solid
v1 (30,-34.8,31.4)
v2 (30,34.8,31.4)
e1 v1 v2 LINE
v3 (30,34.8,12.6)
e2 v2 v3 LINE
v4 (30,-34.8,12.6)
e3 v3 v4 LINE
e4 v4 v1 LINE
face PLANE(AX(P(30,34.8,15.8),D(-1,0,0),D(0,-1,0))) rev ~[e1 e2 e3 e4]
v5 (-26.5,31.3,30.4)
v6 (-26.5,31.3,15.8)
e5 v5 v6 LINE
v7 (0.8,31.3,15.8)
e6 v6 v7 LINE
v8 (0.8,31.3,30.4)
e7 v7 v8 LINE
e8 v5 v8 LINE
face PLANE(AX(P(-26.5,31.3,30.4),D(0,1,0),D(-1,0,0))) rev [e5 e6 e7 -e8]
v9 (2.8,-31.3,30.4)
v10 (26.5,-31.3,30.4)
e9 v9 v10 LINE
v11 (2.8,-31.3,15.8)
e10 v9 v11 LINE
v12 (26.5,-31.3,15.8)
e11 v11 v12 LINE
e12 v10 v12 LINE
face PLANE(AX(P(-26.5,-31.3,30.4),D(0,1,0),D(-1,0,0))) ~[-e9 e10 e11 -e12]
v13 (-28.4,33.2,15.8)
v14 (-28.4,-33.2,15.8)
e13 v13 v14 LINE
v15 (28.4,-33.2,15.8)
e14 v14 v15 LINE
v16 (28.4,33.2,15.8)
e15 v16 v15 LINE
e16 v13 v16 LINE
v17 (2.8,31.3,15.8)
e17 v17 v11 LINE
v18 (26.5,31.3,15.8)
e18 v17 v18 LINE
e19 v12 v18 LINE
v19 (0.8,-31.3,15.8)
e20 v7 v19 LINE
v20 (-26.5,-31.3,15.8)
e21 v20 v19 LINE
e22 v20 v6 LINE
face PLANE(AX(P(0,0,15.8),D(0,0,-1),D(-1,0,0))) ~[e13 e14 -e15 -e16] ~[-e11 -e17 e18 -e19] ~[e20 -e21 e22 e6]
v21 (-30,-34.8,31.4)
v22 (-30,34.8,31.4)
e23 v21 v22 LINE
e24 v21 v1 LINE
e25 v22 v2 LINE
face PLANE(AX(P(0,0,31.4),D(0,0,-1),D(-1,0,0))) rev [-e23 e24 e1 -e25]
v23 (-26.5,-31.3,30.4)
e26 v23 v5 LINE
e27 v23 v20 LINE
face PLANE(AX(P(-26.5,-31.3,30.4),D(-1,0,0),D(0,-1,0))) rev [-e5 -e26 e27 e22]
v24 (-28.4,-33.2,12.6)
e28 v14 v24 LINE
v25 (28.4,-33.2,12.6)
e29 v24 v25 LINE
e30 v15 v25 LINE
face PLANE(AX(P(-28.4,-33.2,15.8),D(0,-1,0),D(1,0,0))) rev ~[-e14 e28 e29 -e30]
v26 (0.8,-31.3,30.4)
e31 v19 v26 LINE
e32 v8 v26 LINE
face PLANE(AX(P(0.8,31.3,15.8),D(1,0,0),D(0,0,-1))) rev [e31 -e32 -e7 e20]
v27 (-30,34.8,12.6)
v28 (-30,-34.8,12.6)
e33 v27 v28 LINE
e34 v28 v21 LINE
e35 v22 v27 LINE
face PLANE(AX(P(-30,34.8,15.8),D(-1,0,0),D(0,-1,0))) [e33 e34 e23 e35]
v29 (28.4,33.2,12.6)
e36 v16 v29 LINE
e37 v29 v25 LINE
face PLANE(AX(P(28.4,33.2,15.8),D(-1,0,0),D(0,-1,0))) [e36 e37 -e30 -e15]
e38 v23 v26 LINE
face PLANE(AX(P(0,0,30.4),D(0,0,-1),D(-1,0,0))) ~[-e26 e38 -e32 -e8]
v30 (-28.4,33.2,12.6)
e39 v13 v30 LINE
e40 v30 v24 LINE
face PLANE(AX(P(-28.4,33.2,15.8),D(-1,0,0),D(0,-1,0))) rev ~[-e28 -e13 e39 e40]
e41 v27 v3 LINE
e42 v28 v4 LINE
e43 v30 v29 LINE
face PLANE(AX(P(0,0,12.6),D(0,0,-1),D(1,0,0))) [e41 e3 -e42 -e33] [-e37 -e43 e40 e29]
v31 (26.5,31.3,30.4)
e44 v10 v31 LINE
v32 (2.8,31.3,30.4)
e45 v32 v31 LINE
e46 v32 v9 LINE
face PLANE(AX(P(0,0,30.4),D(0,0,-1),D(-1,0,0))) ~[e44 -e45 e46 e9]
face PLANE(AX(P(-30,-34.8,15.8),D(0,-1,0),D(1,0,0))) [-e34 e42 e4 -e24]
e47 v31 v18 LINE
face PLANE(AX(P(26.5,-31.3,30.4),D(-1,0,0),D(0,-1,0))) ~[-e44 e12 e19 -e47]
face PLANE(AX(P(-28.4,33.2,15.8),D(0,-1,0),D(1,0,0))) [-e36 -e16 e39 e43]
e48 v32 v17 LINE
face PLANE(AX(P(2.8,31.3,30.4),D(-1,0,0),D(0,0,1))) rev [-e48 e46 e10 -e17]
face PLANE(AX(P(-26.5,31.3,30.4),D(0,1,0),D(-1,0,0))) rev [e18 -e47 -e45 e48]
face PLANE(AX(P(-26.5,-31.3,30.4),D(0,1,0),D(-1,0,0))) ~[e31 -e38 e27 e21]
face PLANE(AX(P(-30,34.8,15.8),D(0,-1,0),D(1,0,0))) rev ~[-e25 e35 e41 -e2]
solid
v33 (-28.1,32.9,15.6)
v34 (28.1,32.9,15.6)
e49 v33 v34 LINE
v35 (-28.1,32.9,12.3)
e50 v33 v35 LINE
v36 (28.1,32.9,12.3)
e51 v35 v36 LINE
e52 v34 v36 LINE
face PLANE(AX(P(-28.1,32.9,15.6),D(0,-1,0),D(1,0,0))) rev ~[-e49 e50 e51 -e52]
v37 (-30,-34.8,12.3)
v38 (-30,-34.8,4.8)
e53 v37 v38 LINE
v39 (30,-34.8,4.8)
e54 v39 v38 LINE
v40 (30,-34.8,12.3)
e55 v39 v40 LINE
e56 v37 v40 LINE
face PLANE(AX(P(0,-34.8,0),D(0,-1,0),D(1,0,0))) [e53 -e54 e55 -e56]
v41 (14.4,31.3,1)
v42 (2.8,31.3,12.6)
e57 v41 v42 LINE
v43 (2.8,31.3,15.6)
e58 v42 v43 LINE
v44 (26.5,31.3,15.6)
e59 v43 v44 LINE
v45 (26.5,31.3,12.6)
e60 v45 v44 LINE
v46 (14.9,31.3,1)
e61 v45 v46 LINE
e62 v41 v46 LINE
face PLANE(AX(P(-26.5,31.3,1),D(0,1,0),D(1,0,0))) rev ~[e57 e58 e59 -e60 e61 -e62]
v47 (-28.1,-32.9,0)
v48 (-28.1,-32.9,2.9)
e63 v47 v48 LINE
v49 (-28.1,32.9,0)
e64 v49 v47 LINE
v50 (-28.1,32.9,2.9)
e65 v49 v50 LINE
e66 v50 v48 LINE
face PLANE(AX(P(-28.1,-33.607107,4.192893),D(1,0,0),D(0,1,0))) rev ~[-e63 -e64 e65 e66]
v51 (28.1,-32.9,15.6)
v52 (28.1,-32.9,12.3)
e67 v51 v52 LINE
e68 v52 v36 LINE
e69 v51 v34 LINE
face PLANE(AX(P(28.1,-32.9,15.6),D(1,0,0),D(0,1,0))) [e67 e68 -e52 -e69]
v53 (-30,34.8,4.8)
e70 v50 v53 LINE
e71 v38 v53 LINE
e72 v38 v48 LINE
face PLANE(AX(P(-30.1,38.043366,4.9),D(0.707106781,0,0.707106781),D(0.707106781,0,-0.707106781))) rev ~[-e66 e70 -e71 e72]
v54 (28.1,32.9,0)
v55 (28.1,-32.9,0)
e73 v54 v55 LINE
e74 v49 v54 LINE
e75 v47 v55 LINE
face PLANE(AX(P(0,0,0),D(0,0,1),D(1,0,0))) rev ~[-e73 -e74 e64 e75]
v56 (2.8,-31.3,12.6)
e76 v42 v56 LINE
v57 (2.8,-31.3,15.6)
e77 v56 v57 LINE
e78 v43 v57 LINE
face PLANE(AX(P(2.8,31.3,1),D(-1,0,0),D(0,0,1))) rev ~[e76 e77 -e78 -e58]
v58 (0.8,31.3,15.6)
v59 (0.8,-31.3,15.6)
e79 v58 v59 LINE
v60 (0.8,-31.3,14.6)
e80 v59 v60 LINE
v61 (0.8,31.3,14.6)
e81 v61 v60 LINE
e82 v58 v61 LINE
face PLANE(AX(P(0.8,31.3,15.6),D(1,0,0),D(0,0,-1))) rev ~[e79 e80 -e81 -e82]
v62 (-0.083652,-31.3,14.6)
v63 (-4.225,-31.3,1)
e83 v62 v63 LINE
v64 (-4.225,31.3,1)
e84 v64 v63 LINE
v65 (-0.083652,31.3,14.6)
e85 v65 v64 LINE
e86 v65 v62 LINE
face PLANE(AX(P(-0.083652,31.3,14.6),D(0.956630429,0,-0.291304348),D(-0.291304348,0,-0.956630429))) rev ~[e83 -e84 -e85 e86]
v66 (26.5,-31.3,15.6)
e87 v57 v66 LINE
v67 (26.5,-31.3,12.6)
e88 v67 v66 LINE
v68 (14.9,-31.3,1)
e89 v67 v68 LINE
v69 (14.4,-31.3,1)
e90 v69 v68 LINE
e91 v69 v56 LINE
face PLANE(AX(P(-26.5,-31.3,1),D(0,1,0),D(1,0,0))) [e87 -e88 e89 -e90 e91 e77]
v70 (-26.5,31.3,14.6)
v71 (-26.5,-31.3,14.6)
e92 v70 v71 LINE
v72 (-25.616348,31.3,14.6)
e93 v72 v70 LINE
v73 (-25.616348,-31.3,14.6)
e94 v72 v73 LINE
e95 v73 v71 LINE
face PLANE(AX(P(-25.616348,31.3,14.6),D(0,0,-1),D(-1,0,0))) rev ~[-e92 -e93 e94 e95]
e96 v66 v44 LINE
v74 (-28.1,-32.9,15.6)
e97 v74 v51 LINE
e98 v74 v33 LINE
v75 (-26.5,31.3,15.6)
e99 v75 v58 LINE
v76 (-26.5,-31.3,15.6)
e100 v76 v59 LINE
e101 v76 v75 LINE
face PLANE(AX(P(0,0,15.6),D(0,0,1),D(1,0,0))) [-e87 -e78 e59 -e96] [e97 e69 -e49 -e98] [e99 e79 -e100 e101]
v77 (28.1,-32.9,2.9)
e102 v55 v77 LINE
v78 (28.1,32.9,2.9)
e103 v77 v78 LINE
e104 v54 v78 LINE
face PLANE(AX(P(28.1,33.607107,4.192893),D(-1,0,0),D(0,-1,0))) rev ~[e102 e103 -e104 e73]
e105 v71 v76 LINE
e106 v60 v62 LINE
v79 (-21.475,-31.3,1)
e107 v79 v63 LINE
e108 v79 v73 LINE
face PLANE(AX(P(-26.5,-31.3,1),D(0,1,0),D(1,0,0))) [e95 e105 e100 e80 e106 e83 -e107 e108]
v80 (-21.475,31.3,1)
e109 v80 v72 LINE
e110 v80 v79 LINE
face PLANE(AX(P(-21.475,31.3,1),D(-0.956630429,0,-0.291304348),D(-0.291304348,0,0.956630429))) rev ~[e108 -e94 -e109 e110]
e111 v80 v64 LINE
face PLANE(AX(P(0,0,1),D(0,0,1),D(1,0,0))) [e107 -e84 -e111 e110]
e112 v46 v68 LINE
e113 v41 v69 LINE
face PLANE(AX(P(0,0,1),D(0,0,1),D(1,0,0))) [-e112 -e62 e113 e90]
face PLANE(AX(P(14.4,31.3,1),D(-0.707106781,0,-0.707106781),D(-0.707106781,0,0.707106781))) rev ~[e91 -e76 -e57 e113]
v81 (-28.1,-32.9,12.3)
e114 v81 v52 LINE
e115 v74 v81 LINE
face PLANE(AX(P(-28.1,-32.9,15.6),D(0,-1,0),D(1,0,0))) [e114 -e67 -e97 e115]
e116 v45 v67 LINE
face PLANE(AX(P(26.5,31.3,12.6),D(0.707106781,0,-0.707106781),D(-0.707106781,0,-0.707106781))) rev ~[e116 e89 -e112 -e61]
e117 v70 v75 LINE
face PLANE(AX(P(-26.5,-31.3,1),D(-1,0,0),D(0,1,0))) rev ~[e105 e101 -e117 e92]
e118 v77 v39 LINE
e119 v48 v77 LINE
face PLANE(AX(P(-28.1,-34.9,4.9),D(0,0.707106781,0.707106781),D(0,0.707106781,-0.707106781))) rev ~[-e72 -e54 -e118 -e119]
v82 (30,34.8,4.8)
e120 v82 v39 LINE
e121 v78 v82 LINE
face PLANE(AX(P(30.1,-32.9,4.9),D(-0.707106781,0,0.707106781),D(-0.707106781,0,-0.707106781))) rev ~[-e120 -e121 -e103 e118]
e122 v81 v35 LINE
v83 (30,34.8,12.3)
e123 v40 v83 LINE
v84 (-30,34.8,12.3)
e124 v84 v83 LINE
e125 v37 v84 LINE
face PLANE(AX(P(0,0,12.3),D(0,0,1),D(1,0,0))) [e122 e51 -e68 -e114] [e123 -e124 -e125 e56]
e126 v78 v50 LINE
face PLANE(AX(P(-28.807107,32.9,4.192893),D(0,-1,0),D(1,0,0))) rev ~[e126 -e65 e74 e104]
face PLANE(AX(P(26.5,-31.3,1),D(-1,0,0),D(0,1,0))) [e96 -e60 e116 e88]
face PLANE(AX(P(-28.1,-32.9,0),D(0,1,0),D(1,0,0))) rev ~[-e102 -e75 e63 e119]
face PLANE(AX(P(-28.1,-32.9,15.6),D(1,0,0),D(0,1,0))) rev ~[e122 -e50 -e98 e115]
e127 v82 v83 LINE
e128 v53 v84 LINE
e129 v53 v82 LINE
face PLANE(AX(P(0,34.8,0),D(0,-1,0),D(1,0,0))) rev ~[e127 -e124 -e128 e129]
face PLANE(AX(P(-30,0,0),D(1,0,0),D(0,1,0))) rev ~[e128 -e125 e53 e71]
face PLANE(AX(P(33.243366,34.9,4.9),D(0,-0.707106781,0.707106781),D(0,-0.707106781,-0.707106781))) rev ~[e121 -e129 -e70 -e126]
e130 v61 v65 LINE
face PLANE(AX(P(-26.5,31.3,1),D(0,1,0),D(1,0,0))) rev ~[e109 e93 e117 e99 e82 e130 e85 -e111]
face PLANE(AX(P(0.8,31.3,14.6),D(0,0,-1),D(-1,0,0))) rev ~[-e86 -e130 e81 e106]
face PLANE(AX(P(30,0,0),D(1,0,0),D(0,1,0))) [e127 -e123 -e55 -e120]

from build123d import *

# Parameters (mm, degrees)
F6_W          = 60
F6_H          = 69.6
F7_DEPTH      = 1
F8_W          = 60
F8_H          = 69.6
F8_W_2        = 53
F8_H_2        = 62.6
F9_DEPTH      = 14.6
F11_DEPTH     = 62.6
F14_W         = 60
F14_H         = 69.6
F14_W_2       = 56.2
F14_H_2       = 65.8
F15_DEPTH     = 3.3
F16_W         = 60
F16_H         = 69.6
F16_W_2       = 56.2
F16_H_2       = 65.8
F17_DEPTH     = 4.9
F18_T4_DEPTH  = 56.2
F18_T9_DEPTH  = 65.8
F18_T14_DEPTH = 56.2
F18_T19_DEPTH = 65.8
F18_T25_DEPTH = 61.3433659759
F18_T31_DEPTH = 70.9433659759
F18_T40_DEPTH = 61.3433659759
F18_T46_DEPTH = 70.9433659759
F18_T55_DEPTH = 61.3433659759
F18_T61_DEPTH = 70.9433659759
F18_T70_DEPTH = 70.9433659759
F18_T76_DEPTH = 61.3433659759
F19_W         = 60
F19_H         = 69.6
F19_W_2       = 56.8
F19_H_2       = 66.4
F20_DEPTH     = 3.2
F21_DEPTH     = 62.6


# Not quite as in the source:
# - a fillet or chamfer that OpenCascade refuses, or shapes differently, is made with other operations: its cross-section is extruded or revolved along the edge and cut away or added


with BuildPart() as f7:
    # F6 (on Top) → F7 (new body)
    with BuildSketch(Plane.XY):
        Rectangle(F6_W, F6_H)
    extrude(amount=F7_DEPTH)

    # F8 (on face) → F9 (join)
    with BuildSketch(Plane.XY.offset(1)):
        Rectangle(F8_W, F8_H)
        Rectangle(F8_W_2, F8_H_2, mode=Mode.SUBTRACT)
    extrude(amount=F9_DEPTH)

    # F10 (on face) → F11 (join, through all)
    with BuildSketch(Plane.XZ.offset(-31.3)):
        Polygon((2.8, 15.6), (0.8, 15.6), (0.8, 14.6), (0.8, 1), (2.8, 1), (2.8, 12.6), align=None)
    extrude(amount=F11_DEPTH)


with BuildPart() as f13_1:
    # F13: instance of F7
    add(f7.part.mirror(Plane(origin=(0.2291641245, 0, 15.7), x_dir=(1, 0, 0), z_dir=(0, 0, 1))))

    # F19 (on face) → F20 (join)
    with BuildSketch(Plane(origin=(0, 0, 15.8), x_dir=(1, 0, 0), z_dir=(0, 0, -1))):
        Rectangle(F19_W, F19_H)
        Rectangle(F19_W_2, F19_H_2, mode=Mode.SUBTRACT)
    extrude(amount=F20_DEPTH)


with BuildPart() as f7_1:
    add(f7.part)

    # F14 (on face) → F15 (cut)
    with BuildSketch(Plane.XY.offset(15.6)):
        Rectangle(F14_W, F14_H)
        Rectangle(F14_W_2, F14_H_2, mode=Mode.SUBTRACT)
    extrude(amount=-F15_DEPTH, mode=Mode.SUBTRACT)

    # F16 (on face) → F17 (cut)
    with BuildSketch(Plane(origin=(0, 0, 0), x_dir=(1, 0, 0), z_dir=(0, 0, -1))):
        Rectangle(F16_W, F16_H)
        Rectangle(F16_W_2, F16_H_2, mode=Mode.SUBTRACT)
    extrude(amount=-F17_DEPTH, mode=Mode.SUBTRACT)

    # F18: chamfer of 2 on 4 edges, made by hand


with BuildPart() as f18_tool2:
    # F18_s3 → F18_t4 (new body)
    with BuildSketch(Plane.YZ.offset(-28.1)):
        Polygon((-34.9, 4.9), (-32.9, 2.9), (-32.9, 4.9), align=None)
    extrude(amount=F18_T4_DEPTH)

    split(bisect_by=Plane.XZ.offset(34.8), keep=Keep.BOTTOM)


with BuildPart() as f7_2:
    add(f7_1.part)

    # F18_t1: union F18_tool2
    add(f18_tool2.part)


with BuildPart() as f18_tool7:
    # F18_s8 → F18_t9 (new body)
    with BuildSketch(Plane.XZ.offset(-32.9)):
        Polygon((-30.1, 4.9), (-28.1, 2.9), (-28.1, 4.9), align=None)
    extrude(amount=F18_T9_DEPTH)

    split(bisect_by=Plane.YZ.offset(-30), keep=Keep.TOP)


with BuildPart() as f7_3:
    add(f7_2.part)

    # F18_t6: union F18_tool7
    add(f18_tool7.part)


with BuildPart() as f18_tool12:
    # F18_s13 → F18_t14 (new body)
    with BuildSketch(Plane.YZ.offset(28.1)):
        Polygon((34.9, 4.9), (32.9, 2.9), (32.9, 4.9), align=None)
    extrude(amount=-F18_T14_DEPTH)

    split(bisect_by=Plane.XZ.offset(-34.8), keep=Keep.TOP)


with BuildPart() as f7_4:
    add(f7_3.part)

    # F18_t11: union F18_tool12
    add(f18_tool12.part)


with BuildPart() as f18_tool17:
    # F18_s18 → F18_t19 (new body)
    with BuildSketch(Plane.XZ.offset(32.9)):
        Polygon((30.1, 4.9), (28.1, 2.9), (28.1, 4.9), align=None)
    extrude(amount=-F18_T19_DEPTH)

    split(bisect_by=Plane.YZ.offset(30), keep=Keep.BOTTOM)


with BuildPart() as f7_5:
    add(f7_4.part)

    # F18_t16: union F18_tool17
    add(f18_tool17.part)


with BuildPart() as f18_tool23:
    # F18_s24 → F18_t25 (new body)
    with BuildSketch(Plane.YZ.offset(-33.2433659759)):
        Polygon((-34.9, 4.9), (-32.9, 2.9), (-32.9, 4.9), align=None)
    extrude(amount=F18_T25_DEPTH)

    split(bisect_by=Plane.XZ.offset(34.8), keep=Keep.BOTTOM)

    split(bisect_by=Plane.YZ.offset(-30), keep=Keep.TOP)

    split(bisect_by=Plane.YZ.offset(-28.1), keep=Keep.BOTTOM)


with BuildPart() as f18_tool29:
    # F18_s30 → F18_t31 (new body)
    with BuildSketch(Plane.XZ.offset(-32.9)):
        Polygon((-30.1, 4.9), (-28.1, 2.9), (-28.1, 4.9), align=None)
    extrude(amount=F18_T31_DEPTH)

    split(bisect_by=Plane.XZ.offset(34.8), keep=Keep.BOTTOM)

    split(bisect_by=Plane.YZ.offset(-30), keep=Keep.TOP)

    split(bisect_by=Plane.XZ.offset(32.9), keep=Keep.TOP)


with BuildPart() as f18_tool23_1:
    add(f18_tool23.part)

    # F18_t35: intersect F18_tool29
    add(f18_tool29.part, mode=Mode.INTERSECT)


with BuildPart() as f7_6:
    add(f7_5.part)

    # F18_t21: union F18_tool23
    add(f18_tool23_1.part)


with BuildPart() as f18_tool38:
    # F18_s39 → F18_t40 (new body)
    with BuildSketch(Plane.YZ.offset(-28.1)):
        Polygon((-34.9, 4.9), (-32.9, 2.9), (-32.9, 4.9), align=None)
    extrude(amount=F18_T40_DEPTH)

    split(bisect_by=Plane.XZ.offset(34.8), keep=Keep.BOTTOM)

    split(bisect_by=Plane.YZ.offset(30), keep=Keep.BOTTOM)

    split(bisect_by=Plane.YZ.offset(28.1), keep=Keep.TOP)


with BuildPart() as f18_tool44:
    # F18_s45 → F18_t46 (new body)
    with BuildSketch(Plane.XZ.offset(38.0433659759)):
        Polygon((30.1, 4.9), (28.1, 2.9), (28.1, 4.9), align=None)
    extrude(amount=-F18_T46_DEPTH)

    split(bisect_by=Plane.XZ.offset(34.8), keep=Keep.BOTTOM)

    split(bisect_by=Plane.YZ.offset(30), keep=Keep.BOTTOM)

    split(bisect_by=Plane.XZ.offset(32.9), keep=Keep.TOP)


with BuildPart() as f18_tool38_1:
    add(f18_tool38.part)

    # F18_t50: intersect F18_tool44
    add(f18_tool44.part, mode=Mode.INTERSECT)


with BuildPart() as f7_7:
    add(f7_6.part)

    # F18_t36: union F18_tool38
    add(f18_tool38_1.part)


with BuildPart() as f18_tool53:
    # F18_s54 → F18_t55 (new body)
    with BuildSketch(Plane.YZ.offset(28.1)):
        Polygon((34.9, 4.9), (32.9, 2.9), (32.9, 4.9), align=None)
    extrude(amount=-F18_T55_DEPTH)

    split(bisect_by=Plane.YZ.offset(-30), keep=Keep.TOP)

    split(bisect_by=Plane.XZ.offset(-34.8), keep=Keep.TOP)

    split(bisect_by=Plane.YZ.offset(-28.1), keep=Keep.BOTTOM)


with BuildPart() as f18_tool59:
    # F18_s60 → F18_t61 (new body)
    with BuildSketch(Plane.XZ.offset(-38.0433659759)):
        Polygon((-30.1, 4.9), (-28.1, 2.9), (-28.1, 4.9), align=None)
    extrude(amount=F18_T61_DEPTH)

    split(bisect_by=Plane.YZ.offset(-30), keep=Keep.TOP)

    split(bisect_by=Plane.XZ.offset(-34.8), keep=Keep.TOP)

    split(bisect_by=Plane.XZ.offset(-32.9), keep=Keep.BOTTOM)


with BuildPart() as f18_tool53_1:
    add(f18_tool53.part)

    # F18_t65: intersect F18_tool59
    add(f18_tool59.part, mode=Mode.INTERSECT)


with BuildPart() as f7_8:
    add(f7_7.part)

    # F18_t51: union F18_tool53
    add(f18_tool53_1.part)


with BuildPart() as f18_tool68:
    # F18_s69 → F18_t70 (new body)
    with BuildSketch(Plane.XZ.offset(32.9)):
        Polygon((30.1, 4.9), (28.1, 2.9), (28.1, 4.9), align=None)
    extrude(amount=-F18_T70_DEPTH)

    split(bisect_by=Plane.YZ.offset(30), keep=Keep.BOTTOM)

    split(bisect_by=Plane.XZ.offset(-34.8), keep=Keep.TOP)

    split(bisect_by=Plane.XZ.offset(-32.9), keep=Keep.BOTTOM)


with BuildPart() as f18_tool74:
    # F18_s75 → F18_t76 (new body)
    with BuildSketch(Plane.YZ.offset(33.2433659759)):
        Polygon((34.9, 4.9), (32.9, 2.9), (32.9, 4.9), align=None)
    extrude(amount=-F18_T76_DEPTH)

    split(bisect_by=Plane.YZ.offset(30), keep=Keep.BOTTOM)

    split(bisect_by=Plane.XZ.offset(-34.8), keep=Keep.TOP)

    split(bisect_by=Plane.YZ.offset(28.1), keep=Keep.TOP)


with BuildPart() as f18_tool68_1:
    add(f18_tool68.part)

    # F18_t80: intersect F18_tool74
    add(f18_tool74.part, mode=Mode.INTERSECT)


with BuildPart() as f7_9:
    add(f7_8.part)

    # F18_t66: union F18_tool68
    add(f18_tool68_1.part)

    # F10 (on face) → F21 (join, through all)
    with BuildSketch(Plane.XZ.offset(-31.3)):
        Polygon((14.4, 1), (2.8, 12.6), (2.8, 1), align=None)
        Polygon((26.5, 1), (26.5, 12.6), (14.9, 1), align=None)
        Polygon((-21.475, 1), (-25.6163476009, 14.6), (-26.5, 14.6), (-26.5, 1), align=None)
        Polygon((0.8, 1), (0.8, 14.6), (-0.0836523991, 14.6), (-4.225, 1), align=None)
    extrude(amount=F21_DEPTH)


solid = Compound([f13_1.part, f7_9.part])
